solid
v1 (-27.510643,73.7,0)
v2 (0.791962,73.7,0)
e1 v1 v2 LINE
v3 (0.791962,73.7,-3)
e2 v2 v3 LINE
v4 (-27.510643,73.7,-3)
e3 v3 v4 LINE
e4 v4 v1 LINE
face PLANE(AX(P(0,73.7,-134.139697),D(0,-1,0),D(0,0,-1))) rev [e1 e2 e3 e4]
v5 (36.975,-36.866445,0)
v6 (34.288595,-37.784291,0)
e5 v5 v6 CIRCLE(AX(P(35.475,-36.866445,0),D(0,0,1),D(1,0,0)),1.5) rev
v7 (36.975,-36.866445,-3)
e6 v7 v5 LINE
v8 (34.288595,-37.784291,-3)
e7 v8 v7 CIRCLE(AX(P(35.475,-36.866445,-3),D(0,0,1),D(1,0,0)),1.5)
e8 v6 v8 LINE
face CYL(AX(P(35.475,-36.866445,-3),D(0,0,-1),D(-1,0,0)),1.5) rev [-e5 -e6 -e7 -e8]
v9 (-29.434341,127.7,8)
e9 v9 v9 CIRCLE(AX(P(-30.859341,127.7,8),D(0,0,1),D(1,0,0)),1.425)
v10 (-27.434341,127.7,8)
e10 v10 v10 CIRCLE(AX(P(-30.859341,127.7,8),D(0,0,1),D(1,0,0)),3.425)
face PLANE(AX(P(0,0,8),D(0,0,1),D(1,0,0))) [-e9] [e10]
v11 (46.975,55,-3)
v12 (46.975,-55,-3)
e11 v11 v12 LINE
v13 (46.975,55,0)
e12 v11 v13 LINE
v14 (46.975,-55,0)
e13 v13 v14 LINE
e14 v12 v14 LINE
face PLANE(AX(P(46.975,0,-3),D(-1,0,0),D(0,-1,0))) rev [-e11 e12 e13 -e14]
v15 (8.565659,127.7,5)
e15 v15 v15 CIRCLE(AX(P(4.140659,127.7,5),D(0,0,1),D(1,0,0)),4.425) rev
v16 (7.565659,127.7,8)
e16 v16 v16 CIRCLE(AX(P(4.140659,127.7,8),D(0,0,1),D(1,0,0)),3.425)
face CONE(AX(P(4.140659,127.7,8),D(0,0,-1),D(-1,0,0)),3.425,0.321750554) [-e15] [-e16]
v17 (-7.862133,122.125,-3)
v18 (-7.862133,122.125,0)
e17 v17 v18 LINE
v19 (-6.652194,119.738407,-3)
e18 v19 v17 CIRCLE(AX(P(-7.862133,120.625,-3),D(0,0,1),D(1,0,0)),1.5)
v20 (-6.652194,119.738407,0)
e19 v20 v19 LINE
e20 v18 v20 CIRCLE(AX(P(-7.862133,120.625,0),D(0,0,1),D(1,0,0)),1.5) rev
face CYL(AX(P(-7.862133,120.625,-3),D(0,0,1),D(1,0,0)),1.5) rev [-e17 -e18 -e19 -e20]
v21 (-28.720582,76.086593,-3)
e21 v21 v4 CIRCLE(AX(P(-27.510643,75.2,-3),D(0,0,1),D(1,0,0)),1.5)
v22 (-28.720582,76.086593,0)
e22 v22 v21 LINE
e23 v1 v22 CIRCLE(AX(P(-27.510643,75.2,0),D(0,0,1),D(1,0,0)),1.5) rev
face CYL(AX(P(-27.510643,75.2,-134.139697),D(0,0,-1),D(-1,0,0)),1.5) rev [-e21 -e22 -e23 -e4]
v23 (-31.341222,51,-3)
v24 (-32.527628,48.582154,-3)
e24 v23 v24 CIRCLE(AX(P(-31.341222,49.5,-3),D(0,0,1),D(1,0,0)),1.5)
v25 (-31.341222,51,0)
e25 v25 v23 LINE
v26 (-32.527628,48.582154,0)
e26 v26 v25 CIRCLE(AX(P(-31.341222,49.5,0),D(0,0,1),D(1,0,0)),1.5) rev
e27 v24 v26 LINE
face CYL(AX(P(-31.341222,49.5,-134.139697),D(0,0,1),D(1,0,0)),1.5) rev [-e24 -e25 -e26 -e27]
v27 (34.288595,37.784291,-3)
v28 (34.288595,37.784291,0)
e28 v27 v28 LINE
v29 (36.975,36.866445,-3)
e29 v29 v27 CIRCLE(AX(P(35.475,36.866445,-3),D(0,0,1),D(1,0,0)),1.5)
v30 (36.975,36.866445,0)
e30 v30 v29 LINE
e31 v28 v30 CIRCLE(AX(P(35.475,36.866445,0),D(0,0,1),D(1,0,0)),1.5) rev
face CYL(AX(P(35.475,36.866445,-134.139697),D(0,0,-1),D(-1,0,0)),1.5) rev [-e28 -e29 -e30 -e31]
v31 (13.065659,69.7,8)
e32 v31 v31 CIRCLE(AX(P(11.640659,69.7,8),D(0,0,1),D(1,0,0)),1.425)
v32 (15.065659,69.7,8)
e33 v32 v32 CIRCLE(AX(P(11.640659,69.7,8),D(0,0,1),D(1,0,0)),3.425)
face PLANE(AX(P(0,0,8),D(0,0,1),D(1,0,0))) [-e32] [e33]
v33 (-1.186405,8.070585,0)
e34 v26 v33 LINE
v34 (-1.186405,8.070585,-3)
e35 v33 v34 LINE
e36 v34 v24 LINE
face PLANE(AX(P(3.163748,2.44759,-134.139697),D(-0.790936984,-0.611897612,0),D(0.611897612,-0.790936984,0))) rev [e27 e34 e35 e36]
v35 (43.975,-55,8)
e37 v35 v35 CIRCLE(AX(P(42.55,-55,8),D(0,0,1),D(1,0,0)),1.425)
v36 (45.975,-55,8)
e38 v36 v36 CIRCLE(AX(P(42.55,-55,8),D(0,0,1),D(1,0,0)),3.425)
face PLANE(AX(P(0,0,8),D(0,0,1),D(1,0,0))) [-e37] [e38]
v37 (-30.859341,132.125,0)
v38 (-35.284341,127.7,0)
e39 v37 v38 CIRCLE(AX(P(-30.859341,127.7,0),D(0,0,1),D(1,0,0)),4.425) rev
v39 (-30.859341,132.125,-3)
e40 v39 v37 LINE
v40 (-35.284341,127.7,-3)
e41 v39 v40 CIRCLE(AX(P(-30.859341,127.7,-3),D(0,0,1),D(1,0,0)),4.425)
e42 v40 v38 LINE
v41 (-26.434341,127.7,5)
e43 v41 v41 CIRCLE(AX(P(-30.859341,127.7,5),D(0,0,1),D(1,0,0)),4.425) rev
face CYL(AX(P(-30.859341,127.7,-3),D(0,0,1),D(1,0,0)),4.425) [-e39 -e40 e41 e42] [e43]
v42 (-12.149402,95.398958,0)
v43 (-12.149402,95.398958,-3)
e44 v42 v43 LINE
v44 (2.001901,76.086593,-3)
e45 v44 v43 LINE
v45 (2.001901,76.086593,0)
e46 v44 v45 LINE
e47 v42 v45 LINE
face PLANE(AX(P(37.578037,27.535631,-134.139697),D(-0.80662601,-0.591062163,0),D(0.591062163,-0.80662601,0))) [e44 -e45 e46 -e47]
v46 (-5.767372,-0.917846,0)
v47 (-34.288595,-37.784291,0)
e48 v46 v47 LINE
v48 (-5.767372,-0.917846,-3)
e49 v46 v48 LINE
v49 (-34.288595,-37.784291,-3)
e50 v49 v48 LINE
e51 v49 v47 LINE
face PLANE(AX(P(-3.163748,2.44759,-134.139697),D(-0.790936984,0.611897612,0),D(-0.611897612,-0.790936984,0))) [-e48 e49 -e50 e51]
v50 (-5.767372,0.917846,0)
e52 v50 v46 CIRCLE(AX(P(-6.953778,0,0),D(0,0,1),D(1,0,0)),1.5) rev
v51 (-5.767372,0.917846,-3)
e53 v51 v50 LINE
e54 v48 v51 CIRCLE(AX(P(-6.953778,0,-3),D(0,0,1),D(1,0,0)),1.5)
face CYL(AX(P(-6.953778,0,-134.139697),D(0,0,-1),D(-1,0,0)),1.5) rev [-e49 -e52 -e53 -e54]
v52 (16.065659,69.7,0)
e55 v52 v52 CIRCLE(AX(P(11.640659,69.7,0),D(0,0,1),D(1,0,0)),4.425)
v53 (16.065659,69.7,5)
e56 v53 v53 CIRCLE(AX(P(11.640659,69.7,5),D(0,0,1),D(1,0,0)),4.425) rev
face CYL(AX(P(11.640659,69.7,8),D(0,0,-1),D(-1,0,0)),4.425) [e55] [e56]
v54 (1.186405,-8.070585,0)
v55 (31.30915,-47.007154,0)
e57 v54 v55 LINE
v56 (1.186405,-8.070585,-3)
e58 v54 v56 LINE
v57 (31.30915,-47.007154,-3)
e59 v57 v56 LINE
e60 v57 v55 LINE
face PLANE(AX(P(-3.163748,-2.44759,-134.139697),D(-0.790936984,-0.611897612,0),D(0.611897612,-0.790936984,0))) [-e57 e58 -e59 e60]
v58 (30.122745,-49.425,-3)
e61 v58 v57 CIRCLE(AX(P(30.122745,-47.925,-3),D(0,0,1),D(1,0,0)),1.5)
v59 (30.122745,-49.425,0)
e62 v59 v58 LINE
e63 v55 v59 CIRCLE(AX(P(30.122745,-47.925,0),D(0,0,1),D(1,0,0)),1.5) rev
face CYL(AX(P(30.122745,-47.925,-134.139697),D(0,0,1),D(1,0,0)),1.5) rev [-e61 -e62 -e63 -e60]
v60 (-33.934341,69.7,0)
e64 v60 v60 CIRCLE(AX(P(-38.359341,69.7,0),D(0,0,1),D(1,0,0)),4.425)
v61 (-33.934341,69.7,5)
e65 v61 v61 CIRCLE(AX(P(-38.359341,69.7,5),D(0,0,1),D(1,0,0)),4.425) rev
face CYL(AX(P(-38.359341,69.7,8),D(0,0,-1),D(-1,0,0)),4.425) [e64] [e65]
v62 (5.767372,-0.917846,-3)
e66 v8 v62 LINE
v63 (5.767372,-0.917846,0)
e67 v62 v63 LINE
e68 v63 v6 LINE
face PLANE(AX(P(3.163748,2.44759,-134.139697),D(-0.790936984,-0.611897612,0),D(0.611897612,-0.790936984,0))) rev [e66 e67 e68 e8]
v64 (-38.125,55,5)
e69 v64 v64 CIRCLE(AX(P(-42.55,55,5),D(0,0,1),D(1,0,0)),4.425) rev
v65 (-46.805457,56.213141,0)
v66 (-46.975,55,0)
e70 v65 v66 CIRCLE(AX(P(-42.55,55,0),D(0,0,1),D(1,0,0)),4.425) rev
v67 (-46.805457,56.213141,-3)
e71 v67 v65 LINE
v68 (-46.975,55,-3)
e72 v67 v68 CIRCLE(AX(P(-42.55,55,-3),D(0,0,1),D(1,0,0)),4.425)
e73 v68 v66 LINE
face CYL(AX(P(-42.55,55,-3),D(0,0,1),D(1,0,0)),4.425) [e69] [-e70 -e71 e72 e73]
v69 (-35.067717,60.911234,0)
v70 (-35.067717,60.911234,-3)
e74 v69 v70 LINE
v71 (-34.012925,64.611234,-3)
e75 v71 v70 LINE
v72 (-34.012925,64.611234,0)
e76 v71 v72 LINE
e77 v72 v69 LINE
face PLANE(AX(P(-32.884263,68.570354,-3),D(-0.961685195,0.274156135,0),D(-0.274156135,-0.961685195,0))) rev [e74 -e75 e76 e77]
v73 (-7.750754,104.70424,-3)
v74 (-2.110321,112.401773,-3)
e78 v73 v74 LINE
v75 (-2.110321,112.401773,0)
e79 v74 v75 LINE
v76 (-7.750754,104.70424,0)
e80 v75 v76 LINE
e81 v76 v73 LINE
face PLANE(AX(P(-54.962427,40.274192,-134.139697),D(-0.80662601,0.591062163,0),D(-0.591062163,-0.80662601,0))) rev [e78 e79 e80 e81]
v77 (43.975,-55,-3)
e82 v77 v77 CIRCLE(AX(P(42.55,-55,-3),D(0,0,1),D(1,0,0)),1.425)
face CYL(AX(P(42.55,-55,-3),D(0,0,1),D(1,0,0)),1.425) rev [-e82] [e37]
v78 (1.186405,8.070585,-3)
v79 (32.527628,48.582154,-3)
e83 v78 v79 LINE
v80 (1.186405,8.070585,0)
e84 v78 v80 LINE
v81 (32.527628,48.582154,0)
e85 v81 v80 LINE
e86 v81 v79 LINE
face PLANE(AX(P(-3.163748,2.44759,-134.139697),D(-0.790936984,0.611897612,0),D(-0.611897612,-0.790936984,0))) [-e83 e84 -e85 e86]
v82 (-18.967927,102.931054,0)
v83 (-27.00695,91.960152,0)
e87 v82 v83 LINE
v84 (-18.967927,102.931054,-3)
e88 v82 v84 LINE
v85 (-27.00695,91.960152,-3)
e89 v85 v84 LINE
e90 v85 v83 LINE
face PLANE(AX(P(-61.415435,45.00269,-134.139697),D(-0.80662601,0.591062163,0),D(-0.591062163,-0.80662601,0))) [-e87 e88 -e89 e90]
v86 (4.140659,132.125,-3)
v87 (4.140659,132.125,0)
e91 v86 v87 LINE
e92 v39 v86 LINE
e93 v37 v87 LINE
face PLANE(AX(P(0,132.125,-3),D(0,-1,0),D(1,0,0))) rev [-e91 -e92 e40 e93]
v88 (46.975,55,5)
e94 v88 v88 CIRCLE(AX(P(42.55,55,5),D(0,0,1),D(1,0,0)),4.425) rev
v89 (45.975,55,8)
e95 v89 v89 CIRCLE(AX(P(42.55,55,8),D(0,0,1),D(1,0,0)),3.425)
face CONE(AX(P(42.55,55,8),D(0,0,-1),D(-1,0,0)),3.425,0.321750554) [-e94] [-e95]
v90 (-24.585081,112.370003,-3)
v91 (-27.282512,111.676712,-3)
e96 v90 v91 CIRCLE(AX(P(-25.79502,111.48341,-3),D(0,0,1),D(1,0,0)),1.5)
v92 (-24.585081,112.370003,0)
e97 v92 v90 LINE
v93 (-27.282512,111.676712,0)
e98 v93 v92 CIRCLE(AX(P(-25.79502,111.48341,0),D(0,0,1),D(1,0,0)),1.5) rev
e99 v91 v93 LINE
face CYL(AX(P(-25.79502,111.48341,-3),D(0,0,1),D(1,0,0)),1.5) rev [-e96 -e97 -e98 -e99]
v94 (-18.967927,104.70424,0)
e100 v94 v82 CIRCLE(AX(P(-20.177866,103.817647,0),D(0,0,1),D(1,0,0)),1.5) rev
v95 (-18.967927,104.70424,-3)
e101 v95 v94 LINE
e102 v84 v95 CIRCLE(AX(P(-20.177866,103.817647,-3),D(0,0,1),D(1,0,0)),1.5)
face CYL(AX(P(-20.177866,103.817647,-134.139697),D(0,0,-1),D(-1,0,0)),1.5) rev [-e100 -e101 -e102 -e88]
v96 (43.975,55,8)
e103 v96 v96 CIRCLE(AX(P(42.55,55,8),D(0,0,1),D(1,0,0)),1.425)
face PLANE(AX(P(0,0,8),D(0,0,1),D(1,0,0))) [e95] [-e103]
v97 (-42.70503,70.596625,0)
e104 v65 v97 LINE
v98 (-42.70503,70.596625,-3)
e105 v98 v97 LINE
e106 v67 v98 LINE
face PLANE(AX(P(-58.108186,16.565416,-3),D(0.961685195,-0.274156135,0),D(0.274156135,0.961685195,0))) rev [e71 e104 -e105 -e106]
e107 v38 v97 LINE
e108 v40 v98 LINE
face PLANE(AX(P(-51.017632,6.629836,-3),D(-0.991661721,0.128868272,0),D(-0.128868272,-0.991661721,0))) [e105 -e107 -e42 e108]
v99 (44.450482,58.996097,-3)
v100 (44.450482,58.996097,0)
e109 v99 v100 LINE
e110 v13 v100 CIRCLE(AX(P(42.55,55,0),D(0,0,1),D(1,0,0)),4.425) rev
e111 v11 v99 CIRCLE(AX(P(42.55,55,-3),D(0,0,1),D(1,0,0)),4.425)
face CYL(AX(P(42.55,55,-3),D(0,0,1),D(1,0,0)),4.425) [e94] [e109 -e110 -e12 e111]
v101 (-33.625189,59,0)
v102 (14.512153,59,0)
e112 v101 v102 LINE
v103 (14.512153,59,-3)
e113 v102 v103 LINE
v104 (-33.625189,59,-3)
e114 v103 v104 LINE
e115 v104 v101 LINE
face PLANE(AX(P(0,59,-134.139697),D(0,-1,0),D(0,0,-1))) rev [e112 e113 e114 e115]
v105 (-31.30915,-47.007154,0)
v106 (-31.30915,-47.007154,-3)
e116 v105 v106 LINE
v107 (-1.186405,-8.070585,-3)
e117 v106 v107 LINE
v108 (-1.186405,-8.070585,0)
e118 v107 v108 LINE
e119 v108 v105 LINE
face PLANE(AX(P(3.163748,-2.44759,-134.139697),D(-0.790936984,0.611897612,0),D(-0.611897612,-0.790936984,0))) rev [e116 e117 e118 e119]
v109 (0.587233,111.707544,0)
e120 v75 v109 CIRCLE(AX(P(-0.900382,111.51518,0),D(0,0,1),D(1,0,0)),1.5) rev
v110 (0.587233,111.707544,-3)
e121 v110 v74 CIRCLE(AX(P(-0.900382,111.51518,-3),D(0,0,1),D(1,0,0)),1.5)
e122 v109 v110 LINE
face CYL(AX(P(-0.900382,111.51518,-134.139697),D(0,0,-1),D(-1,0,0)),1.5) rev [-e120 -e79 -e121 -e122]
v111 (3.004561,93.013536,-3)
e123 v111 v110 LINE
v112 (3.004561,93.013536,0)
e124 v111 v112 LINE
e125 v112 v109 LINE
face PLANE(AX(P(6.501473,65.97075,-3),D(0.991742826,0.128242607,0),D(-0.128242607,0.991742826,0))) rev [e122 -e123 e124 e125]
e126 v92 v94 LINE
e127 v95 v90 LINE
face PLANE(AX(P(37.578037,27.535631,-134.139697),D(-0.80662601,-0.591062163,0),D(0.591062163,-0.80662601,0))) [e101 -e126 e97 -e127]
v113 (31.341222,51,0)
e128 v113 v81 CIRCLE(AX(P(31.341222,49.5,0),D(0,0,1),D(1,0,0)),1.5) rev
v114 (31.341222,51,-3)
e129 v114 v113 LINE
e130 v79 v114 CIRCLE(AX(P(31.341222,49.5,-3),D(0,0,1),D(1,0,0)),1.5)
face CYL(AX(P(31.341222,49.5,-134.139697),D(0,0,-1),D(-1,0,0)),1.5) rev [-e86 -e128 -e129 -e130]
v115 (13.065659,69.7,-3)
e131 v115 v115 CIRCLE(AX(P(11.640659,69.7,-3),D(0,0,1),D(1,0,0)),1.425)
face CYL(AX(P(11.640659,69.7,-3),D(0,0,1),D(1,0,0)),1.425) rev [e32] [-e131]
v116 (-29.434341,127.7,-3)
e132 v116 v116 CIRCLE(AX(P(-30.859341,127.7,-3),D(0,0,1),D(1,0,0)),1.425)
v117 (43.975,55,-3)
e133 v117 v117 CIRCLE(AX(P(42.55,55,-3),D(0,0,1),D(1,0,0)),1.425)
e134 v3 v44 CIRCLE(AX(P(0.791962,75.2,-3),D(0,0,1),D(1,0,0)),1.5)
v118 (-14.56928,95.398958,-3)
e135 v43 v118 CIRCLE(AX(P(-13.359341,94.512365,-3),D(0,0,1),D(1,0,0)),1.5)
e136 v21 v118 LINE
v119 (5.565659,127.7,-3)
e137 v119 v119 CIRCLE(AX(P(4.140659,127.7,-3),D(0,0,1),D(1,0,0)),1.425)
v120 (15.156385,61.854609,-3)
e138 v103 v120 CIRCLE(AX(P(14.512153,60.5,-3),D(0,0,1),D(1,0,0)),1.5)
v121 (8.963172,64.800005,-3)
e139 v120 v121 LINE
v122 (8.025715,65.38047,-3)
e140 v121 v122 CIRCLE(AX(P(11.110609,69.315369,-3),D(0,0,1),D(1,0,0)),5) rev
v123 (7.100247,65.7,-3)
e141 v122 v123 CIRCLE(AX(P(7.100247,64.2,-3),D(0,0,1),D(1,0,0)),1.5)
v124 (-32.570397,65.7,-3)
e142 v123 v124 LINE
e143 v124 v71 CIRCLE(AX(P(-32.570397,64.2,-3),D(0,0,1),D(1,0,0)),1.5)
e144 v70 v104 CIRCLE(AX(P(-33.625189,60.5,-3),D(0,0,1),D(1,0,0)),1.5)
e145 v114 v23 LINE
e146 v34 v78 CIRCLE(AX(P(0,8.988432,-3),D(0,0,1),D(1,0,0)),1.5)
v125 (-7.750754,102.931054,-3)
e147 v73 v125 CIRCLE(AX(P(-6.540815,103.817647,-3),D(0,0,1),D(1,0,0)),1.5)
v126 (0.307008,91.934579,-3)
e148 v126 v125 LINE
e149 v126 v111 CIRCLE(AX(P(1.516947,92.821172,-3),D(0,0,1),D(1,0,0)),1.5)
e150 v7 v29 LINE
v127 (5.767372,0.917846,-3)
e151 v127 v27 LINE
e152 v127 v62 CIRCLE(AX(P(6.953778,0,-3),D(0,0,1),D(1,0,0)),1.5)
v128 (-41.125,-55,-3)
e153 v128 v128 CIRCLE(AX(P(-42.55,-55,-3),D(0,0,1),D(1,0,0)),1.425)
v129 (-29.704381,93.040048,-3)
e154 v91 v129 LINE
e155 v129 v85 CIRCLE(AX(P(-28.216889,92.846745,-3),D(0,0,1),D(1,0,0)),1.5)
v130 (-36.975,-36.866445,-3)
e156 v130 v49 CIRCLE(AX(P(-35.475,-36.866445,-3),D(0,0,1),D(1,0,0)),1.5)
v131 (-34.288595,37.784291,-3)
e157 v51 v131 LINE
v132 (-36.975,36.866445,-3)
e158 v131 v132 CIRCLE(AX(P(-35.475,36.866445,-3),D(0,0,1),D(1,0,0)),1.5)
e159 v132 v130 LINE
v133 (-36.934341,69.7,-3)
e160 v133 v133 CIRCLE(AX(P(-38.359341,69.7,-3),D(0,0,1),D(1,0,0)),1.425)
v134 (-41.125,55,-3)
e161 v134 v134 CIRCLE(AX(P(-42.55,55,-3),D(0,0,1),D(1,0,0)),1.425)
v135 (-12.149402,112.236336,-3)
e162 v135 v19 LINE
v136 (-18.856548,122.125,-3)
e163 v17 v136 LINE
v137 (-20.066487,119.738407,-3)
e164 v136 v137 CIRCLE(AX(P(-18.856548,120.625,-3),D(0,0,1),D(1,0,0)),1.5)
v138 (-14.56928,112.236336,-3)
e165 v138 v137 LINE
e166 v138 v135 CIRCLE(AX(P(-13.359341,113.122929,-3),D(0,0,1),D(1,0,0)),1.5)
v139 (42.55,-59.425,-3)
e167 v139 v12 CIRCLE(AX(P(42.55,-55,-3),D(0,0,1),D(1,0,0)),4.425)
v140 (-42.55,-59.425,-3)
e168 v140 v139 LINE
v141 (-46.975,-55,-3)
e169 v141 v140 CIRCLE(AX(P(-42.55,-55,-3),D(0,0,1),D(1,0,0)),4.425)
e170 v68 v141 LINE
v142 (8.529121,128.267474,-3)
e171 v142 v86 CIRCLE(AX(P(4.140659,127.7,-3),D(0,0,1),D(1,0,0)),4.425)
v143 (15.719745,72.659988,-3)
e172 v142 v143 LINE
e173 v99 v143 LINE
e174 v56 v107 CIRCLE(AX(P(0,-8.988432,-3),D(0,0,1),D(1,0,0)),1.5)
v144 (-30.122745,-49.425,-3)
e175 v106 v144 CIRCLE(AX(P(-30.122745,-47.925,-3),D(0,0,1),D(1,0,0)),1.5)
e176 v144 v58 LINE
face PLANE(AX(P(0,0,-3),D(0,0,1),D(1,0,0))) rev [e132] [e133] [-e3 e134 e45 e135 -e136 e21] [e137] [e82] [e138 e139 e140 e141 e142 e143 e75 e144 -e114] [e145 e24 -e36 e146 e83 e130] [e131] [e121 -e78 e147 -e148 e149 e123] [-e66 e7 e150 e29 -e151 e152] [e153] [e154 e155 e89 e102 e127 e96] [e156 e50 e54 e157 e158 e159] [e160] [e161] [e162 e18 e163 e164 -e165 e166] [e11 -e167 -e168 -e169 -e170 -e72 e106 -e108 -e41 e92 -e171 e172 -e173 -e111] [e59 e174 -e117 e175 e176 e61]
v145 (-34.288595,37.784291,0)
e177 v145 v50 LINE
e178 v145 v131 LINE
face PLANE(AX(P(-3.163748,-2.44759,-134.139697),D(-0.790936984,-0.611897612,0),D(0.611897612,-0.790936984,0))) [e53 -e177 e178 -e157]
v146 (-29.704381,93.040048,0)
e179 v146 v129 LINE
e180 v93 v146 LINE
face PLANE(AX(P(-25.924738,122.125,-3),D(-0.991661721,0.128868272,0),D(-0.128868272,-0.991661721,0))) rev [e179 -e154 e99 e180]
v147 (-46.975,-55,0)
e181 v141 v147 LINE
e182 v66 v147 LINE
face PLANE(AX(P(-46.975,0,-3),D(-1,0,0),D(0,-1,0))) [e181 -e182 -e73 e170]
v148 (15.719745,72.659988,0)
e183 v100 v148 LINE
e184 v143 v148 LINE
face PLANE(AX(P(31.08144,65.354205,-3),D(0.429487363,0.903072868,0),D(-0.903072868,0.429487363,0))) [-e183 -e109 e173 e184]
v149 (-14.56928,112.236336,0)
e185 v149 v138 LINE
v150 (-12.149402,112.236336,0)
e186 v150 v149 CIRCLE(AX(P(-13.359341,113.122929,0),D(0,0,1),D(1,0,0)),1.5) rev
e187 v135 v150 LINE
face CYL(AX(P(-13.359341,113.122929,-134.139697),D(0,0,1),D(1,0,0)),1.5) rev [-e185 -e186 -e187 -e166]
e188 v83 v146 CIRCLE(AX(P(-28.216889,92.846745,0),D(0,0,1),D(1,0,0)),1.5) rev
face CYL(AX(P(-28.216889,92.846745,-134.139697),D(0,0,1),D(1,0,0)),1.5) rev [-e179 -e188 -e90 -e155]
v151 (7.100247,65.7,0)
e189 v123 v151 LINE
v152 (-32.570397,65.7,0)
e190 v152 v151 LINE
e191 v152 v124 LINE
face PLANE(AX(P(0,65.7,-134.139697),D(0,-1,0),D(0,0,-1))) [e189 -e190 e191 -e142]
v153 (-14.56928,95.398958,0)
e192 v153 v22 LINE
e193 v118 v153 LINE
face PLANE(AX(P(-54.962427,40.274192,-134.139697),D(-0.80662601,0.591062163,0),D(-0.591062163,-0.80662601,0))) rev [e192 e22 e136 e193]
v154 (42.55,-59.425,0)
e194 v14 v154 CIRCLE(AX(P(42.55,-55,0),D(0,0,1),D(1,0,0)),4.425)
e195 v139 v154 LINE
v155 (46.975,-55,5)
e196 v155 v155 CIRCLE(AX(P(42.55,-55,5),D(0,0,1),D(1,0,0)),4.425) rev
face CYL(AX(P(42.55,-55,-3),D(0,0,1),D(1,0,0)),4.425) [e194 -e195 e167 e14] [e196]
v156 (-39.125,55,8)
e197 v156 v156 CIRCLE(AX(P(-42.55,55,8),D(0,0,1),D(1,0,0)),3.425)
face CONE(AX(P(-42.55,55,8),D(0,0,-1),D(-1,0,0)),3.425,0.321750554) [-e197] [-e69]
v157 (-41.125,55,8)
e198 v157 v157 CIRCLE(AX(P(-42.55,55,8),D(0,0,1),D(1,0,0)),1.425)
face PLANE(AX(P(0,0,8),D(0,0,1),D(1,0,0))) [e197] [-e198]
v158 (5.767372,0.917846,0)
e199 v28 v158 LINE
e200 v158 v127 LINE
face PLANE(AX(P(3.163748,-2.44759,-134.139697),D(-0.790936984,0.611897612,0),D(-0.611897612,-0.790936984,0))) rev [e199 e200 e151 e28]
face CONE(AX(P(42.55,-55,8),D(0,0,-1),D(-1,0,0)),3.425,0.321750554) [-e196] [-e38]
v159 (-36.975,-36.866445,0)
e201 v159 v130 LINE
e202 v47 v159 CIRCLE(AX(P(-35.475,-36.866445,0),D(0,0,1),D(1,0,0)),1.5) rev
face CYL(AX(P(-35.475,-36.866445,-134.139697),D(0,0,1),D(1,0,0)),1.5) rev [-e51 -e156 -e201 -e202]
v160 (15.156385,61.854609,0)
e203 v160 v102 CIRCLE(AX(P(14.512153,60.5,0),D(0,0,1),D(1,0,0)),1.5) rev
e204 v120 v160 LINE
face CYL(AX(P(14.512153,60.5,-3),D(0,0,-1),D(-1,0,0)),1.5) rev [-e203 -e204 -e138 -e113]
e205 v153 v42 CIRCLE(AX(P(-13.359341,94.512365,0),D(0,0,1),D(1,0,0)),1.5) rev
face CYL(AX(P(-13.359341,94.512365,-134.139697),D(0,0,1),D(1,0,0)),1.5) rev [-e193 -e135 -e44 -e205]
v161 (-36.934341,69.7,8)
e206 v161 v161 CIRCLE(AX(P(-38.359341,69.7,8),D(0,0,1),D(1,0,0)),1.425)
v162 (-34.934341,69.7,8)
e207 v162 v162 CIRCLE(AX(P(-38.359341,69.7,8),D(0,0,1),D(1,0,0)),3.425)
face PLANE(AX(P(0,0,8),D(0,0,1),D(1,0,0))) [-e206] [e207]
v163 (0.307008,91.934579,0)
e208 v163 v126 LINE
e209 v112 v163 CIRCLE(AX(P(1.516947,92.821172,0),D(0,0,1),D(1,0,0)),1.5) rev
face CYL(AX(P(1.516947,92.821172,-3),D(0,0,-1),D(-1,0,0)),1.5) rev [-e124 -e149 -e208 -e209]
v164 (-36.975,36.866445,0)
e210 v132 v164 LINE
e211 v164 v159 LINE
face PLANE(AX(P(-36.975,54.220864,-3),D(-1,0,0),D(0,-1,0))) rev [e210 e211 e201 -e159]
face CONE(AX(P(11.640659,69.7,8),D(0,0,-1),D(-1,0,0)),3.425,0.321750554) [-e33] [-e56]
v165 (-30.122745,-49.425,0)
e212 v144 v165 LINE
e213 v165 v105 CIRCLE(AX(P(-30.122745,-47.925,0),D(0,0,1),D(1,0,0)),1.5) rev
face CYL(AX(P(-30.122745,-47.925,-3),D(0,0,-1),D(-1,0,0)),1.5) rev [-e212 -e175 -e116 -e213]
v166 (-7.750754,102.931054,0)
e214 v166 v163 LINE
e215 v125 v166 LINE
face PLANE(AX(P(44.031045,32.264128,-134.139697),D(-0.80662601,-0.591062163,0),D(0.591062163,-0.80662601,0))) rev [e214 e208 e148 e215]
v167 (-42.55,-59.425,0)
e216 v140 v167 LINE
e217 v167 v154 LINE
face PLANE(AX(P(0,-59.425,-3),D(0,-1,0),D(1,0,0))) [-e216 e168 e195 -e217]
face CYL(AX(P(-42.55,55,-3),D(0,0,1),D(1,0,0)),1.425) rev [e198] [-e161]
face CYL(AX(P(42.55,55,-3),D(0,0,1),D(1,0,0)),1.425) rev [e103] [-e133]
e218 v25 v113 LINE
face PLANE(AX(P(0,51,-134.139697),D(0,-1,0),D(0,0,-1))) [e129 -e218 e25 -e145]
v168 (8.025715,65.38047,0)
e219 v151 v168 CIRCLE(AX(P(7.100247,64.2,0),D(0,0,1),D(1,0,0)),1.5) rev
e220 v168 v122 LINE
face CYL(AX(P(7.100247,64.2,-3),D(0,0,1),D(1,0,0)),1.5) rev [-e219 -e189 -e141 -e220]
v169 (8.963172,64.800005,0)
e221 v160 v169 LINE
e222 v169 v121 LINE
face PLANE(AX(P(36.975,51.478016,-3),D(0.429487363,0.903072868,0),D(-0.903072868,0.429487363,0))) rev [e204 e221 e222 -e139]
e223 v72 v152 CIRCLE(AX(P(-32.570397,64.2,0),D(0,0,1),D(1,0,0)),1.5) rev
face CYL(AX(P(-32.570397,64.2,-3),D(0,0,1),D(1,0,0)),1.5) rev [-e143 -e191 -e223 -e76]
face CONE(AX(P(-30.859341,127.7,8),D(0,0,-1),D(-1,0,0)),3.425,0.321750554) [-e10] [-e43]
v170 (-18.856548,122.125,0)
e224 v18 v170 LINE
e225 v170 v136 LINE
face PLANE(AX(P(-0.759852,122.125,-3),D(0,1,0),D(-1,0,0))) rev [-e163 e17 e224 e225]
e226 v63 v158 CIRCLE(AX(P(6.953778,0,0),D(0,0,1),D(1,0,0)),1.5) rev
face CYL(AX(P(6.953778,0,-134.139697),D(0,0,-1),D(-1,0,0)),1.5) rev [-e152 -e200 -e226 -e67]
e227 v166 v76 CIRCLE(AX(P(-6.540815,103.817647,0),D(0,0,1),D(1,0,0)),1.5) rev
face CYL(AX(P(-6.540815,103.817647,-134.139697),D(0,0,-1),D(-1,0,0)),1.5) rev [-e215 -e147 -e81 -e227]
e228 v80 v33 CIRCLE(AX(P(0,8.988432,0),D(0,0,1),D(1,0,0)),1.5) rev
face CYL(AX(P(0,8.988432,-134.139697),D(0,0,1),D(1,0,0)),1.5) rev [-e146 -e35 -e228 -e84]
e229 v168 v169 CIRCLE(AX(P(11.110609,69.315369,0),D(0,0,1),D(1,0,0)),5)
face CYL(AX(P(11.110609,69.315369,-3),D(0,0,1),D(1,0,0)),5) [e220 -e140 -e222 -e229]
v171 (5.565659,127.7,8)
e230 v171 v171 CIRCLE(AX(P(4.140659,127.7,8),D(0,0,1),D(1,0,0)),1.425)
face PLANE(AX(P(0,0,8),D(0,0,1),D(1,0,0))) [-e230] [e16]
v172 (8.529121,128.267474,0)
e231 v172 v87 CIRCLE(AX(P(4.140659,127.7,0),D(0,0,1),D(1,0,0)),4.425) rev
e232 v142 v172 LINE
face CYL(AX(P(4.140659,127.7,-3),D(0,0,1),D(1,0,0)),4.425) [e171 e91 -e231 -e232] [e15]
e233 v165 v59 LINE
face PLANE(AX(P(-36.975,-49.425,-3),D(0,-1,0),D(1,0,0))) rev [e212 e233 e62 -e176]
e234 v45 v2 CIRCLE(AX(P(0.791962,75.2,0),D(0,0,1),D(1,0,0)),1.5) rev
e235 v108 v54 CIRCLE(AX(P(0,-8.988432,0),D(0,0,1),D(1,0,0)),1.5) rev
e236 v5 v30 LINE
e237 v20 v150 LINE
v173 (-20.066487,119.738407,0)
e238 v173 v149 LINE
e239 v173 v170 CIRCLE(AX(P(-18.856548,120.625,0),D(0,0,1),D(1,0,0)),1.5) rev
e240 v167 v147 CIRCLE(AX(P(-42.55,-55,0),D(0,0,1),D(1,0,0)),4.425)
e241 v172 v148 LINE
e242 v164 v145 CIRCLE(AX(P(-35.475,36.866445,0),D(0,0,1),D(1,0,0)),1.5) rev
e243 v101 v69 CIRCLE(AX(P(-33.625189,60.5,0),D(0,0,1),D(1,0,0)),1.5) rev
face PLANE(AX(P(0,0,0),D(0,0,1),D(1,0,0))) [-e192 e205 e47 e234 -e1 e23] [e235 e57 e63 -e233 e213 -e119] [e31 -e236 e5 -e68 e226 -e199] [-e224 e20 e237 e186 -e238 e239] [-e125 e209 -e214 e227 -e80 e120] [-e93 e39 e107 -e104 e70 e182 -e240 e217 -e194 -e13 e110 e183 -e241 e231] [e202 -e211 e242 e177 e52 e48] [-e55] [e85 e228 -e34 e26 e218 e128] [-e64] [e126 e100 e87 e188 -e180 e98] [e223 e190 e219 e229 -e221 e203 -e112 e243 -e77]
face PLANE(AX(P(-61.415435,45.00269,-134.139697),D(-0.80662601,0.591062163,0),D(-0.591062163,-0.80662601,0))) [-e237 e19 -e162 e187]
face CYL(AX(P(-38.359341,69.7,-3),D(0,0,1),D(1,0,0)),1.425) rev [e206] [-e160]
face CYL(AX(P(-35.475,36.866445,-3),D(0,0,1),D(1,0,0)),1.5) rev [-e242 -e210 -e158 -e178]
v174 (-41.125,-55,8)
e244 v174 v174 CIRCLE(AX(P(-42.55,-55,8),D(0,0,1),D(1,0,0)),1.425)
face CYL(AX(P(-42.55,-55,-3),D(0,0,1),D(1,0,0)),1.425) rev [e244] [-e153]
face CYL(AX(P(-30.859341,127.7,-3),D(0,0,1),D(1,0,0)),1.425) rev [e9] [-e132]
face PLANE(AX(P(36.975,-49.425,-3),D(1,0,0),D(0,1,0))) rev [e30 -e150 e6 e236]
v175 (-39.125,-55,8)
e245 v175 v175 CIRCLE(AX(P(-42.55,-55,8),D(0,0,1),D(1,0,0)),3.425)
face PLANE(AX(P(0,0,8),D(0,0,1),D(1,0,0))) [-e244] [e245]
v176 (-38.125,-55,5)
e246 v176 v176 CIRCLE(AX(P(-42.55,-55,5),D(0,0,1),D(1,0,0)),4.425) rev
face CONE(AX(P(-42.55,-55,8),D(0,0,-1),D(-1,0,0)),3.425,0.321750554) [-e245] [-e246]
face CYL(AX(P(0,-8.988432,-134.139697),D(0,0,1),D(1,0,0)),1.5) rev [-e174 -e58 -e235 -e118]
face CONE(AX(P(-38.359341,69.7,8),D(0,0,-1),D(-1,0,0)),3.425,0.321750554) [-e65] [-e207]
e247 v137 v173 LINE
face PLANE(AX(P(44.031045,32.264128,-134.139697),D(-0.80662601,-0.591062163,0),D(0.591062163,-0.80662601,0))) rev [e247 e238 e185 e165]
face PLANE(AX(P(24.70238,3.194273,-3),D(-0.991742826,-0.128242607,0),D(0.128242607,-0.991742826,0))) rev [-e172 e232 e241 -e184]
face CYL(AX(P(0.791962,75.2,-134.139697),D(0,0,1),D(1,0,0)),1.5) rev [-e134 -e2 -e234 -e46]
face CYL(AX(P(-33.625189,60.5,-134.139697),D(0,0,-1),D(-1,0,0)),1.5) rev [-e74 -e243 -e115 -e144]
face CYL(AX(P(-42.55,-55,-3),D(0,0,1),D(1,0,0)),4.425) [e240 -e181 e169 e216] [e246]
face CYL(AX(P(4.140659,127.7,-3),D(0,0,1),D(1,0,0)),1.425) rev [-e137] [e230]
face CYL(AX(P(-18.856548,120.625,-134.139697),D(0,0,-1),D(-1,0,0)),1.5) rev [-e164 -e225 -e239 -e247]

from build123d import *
from OCP.BRepFilletAPI import BRepFilletAPI_MakeChamfer

# Parameters (mm, degrees)
BOSS_EXTRUDE1_START       = -3
BOSS_EXTRUDE1_OUTLINE_R   = 1.425
BOSS_EXTRUDE1_DEPTH       = 3
CUT_EXTRUDE1_DEPTH        = 141.259282224
FILLET1_R                 = 5
BOSS_EXTRUDE2_START       = -3
BOSS_EXTRUDE2_DEPTH       = 3
BOSS_EXTRUDE3_OUTLINE_R   = 4.425
BOSS_EXTRUDE3_OUTLINE_R_2 = 1.425
BOSS_EXTRUDE3_DEPTH       = 8
CHAMFER1_SIZE             = 3
CHAMFER1_SIZE2            = 1
FILLET2_R                 = 1.5


with BuildPart() as part:
    # Boss-Extrude1: read off the stored shape, not the designer's step
    # Boss-Extrude1 outline → Boss-Extrude1 (new body)
    with BuildSketch(Plane.XY.offset(BOSS_EXTRUDE1_START)):
        with BuildLine():
            Line((46.975, -55), (46.975, 55))
            ThreePointArc((46.975, 55), (46.291006282, 57.363365609), (44.450481582, 58.996097441))
            Line((44.450481582, 58.996097441), (15.719744672, 72.659987561))
            Line((15.719744672, 72.659987561), (8.529121486, 128.267473535))
            ThreePointArc((8.529121486, 128.267473535), (7.062093597, 131.023529403), (4.140659479, 132.125))
            Line((4.140659479, 132.125), (-30.859340521, 132.125))
            ThreePointArc((-30.859340521, 132.125), (-33.988288028, 130.828947507), (-35.284340521, 127.7))
            Line((-35.284340521, 127.7), (-42.705029635, 70.596624539))
            Line((-42.705029635, 70.596624539), (-46.805456987, 56.213140895))
            ThreePointArc((-46.805456987, 56.213140895), (-46.932409278, 55.612465441), (-46.975, 55))
            Line((-46.975, 55), (-46.975, -55))
            ThreePointArc((-46.975, -55), (-45.678947507, -58.128947507), (-42.55, -59.425))
            Line((-42.55, -59.425), (42.55, -59.425))
            ThreePointArc((42.55, -59.425), (45.678947507, -58.128947507), (46.975, -55))
        make_face()
        with Locations((-42.55, -55)):
            Circle(BOSS_EXTRUDE1_OUTLINE_R, mode=Mode.SUBTRACT)
        with Locations((42.55, -55)):
            Circle(BOSS_EXTRUDE1_OUTLINE_R, mode=Mode.SUBTRACT)
        with Locations((-42.55, 55)):
            Circle(BOSS_EXTRUDE1_OUTLINE_R, mode=Mode.SUBTRACT)
        with Locations((-38.359340521, 69.7)):
            Circle(BOSS_EXTRUDE1_OUTLINE_R, mode=Mode.SUBTRACT)
        with Locations((-30.859340521, 127.7)):
            Circle(BOSS_EXTRUDE1_OUTLINE_R, mode=Mode.SUBTRACT)
        with Locations((11.640659479, 69.7)):
            Circle(BOSS_EXTRUDE1_OUTLINE_R, mode=Mode.SUBTRACT)
        with Locations((42.55, 55)):
            Circle(BOSS_EXTRUDE1_OUTLINE_R, mode=Mode.SUBTRACT)
        with Locations((4.140659479, 127.7)):
            Circle(BOSS_EXTRUDE1_OUTLINE_R, mode=Mode.SUBTRACT)
    extrude(amount=BOSS_EXTRUDE1_DEPTH)

    # Sketch2 → Cut-Extrude1 (cut, through all)
    with BuildSketch(Plane.XY):
        Polygon((36.975, -49.425), (36.975, 51.478016268), (6.501473049, 65.970750135), (-0.759852365, 122.125), (-25.924738161, 122.125), (-32.884263276, 68.570354395), (-36.975, 54.220863544), (-36.975, -49.425), align=None)
    extrude(amount=-CUT_EXTRUDE1_DEPTH, mode=Mode.SUBTRACT)

    # Fillet1
    fillet1_edges = [part.edges().sort_by_distance(p)[0] for p in [
        (36.975, -49.425, -1.5),
        (-36.975, -49.425, -1.5),
        (-36.975, 54.220863544, -1.5),
        (-32.884263276, 68.570354395, -1.5),
        (-25.924738161, 122.125, -1.5),
        (-0.759852365, 122.125, -1.5),
        (6.501473049, 65.970750135, -1.5),
        (36.975, 51.478016268, -1.5),
    ]]
    fillet(fillet1_edges, radius=FILLET1_R)

    # Sketch3 → Boss-Extrude2 (add)
    with BuildSketch(Plane.XY.offset(BOSS_EXTRUDE2_START)):
        with BuildLine():
            Line((-13.359340521, 110.585124752), (-8.400412901, 103.817647059))
            Line((-8.400412901, 103.817647059), (0.106294158, 115.426800222))
            Line((0.106294158, 115.426800222), (-0.196216119, 117.766213034))
            ThreePointArc((-0.196216119, 117.766213034), (-1.762074631, 120.797673514), (-4.907872753, 122.118892529))
            Line((-4.907872753, 122.118892529), (-13.359340521, 110.585124752))
        make_face()
        Polygon((-18.318268141, 103.817647059), (-13.359340521, 97.050169366), (-8.400412901, 103.817647059), (-13.359340521, 110.585124752), align=None)
        Polygon((-30.456475647, 87.252563875), (-32.217656355, 73.7), (-30.469378419, 73.7), (-13.359340521, 97.050169366), (-18.318268141, 103.817647059), align=None)
        with BuildLine():
            Line((-26.490764046, 117.769341361), (-26.799669466, 115.392265338))
            Line((-26.799669466, 115.392265338), (-18.318268141, 103.817647059))
            Line((-18.318268141, 103.817647059), (-13.359340521, 110.585124752))
            Line((-13.359340521, 110.585124752), (-21.809649014, 122.117310459))
            ThreePointArc((-21.809649014, 122.117310459), (-24.935223371, 120.788491562), (-26.490764046, 117.769341361))
        make_face()
        Polygon((3.750697376, 73.7), (5.502001083, 73.7), (3.752025755, 87.233142539), (-8.400412901, 103.817647059), (-13.359340521, 97.050169366), align=None)
        Polygon((-32.217656355, 73.7), (-32.594546524, 70.799770586), (-30.469378419, 73.7), align=None)
        with BuildLine():
            Line((-32.986220482, 68.212708794), (-33.702540681, 65.7))
            Line((-33.702540681, 65.7), (7.656754768, 65.7))
            ThreePointArc((7.656754768, 65.7), (6.649193532, 67.057986899), (6.151894728, 68.674155814))
            Line((6.151894728, 68.674155814), (5.877280449, 70.797839571))
            Line((5.877280449, 70.797839571), (3.750697376, 73.7))
            Line((3.750697376, 73.7), (-30.469378419, 73.7))
            Line((-30.469378419, 73.7), (-32.594546524, 70.799770586))
            Line((-32.594546524, 70.799770586), (-32.836337852, 68.939148105))
            ThreePointArc((-32.836337852, 68.939148105), (-32.897789852, 68.573145266), (-32.986220482, 68.212708794))
        make_face()
        Polygon((3.750697376, 73.7), (5.877280449, 70.797839571), (5.502001083, 73.7), align=None)
        with BuildLine():
            ThreePointArc((-36.783425974, 54.892867127), (-36.862088643, 54.578668017), (-36.920243348, 54.260035115))
            Line((-36.920243348, 54.260035115), (-34.398161636, 51))
            Line((-34.398161636, 51), (34.398161636, 51))
            Line((34.398161636, 51), (35.248308123, 52.098896751))
            ThreePointArc((35.248308123, 52.098896751), (34.710224384, 52.504802867), (34.122436816, 52.834650803))
            Line((34.122436816, 52.834650803), (21.158703634, 59))
            Line((21.158703634, 59), (-35.61256915, 59))
            Line((-35.61256915, 59), (-36.783425974, 54.892867127))
        make_face()
        with BuildLine():
            Line((36.195636792, 51), (34.398161636, 51))
            Line((34.398161636, 51), (0, 6.537041363))
            Line((0, 6.537041363), (5.057292909, 0))
            Line((5.057292909, 0), (36.975, 41.25673067))
            Line((36.975, 41.25673067), (36.975, 48.319286463))
            ThreePointArc((36.975, 48.319286463), (36.776207346, 49.71514033), (36.195636792, 51))
        make_face()
        Polygon((-34.398161636, 51), (-36.975, 51), (-36.975, 41.25673067), (-5.057292909, 0), (0, 6.537041363), align=None)
        with BuildLine():
            ThreePointArc((-36.920243348, 54.260035115), (-36.961292046, 53.892075142), (-36.975, 53.522086454))
            Line((-36.975, 53.522086454), (-36.975, 51))
            Line((-36.975, 51), (-34.398161636, 51))
            Line((-34.398161636, 51), (-36.920243348, 54.260035115))
        make_face()
        with BuildLine():
            Line((35.248308123, 52.098896751), (34.398161636, 51))
            Line((34.398161636, 51), (36.195636792, 51))
            ThreePointArc((36.195636792, 51), (35.762043189, 51.583992251), (35.248308123, 52.098896751))
        make_face()
        with BuildLine():
            Line((5.057292909, 0), (0, -6.537041363))
            Line((0, -6.537041363), (33.08343567, -49.300589233))
            ThreePointArc((33.08343567, -49.300589233), (35.882824097, -47.544120201), (36.975, -44.425))
            Line((36.975, -44.425), (36.975, -41.25673067))
            Line((36.975, -41.25673067), (5.057292909, 0))
        make_face()
        with BuildLine():
            Line((-5.057292909, 0), (-36.975, -41.25673067))
            Line((-36.975, -41.25673067), (-36.975, -44.425))
            ThreePointArc((-36.975, -44.425), (-35.882824097, -47.544120201), (-33.08343567, -49.300589233))
            Line((-33.08343567, -49.300589233), (0, -6.537041363))
            Line((0, -6.537041363), (-5.057292909, 0))
        make_face()
        Polygon((0, 6.537041363), (-5.057292909, 0), (0, -6.537041363), (5.057292909, 0), align=None)
    extrude(amount=BOSS_EXTRUDE2_DEPTH)

    # Boss-Extrude3: read off the stored shape, not the designer's step
    # Boss-Extrude3 outline → Boss-Extrude3 (add)
    # profile 1 of 8: a face of its own
    with BuildSketch(Plane.XY):
        with Locations((42.55, -55)):
            Circle(BOSS_EXTRUDE3_OUTLINE_R)
        with Locations((42.55, -55)):
            Circle(BOSS_EXTRUDE3_OUTLINE_R_2, mode=Mode.SUBTRACT)
    # profile 2 of 8: a face of its own
    with BuildSketch(Plane.XY):
        with Locations((-42.55, -55)):
            Circle(BOSS_EXTRUDE3_OUTLINE_R)
        with Locations((-42.55, -55)):
            Circle(BOSS_EXTRUDE3_OUTLINE_R_2, mode=Mode.SUBTRACT)
    # profile 3 of 8: a face of its own
    with BuildSketch(Plane.XY):
        with Locations((-42.55, 55)):
            Circle(BOSS_EXTRUDE3_OUTLINE_R)
        with Locations((-42.55, 55)):
            Circle(BOSS_EXTRUDE3_OUTLINE_R_2, mode=Mode.SUBTRACT)
    # profile 4 of 8: a face of its own
    with BuildSketch(Plane.XY):
        with Locations((-30.859340521, 127.7)):
            Circle(BOSS_EXTRUDE3_OUTLINE_R)
        with Locations((-30.859340521, 127.7)):
            Circle(BOSS_EXTRUDE3_OUTLINE_R_2, mode=Mode.SUBTRACT)
    # profile 5 of 8: a face of its own
    with BuildSketch(Plane.XY):
        with Locations((4.140659479, 127.7)):
            Circle(BOSS_EXTRUDE3_OUTLINE_R)
        with Locations((4.140659479, 127.7)):
            Circle(BOSS_EXTRUDE3_OUTLINE_R_2, mode=Mode.SUBTRACT)
    # profile 6 of 8: a face of its own
    with BuildSketch(Plane.XY):
        with Locations((42.55, 55)):
            Circle(BOSS_EXTRUDE3_OUTLINE_R)
        with Locations((42.55, 55)):
            Circle(BOSS_EXTRUDE3_OUTLINE_R_2, mode=Mode.SUBTRACT)
    # profile 7 of 8: a face of its own
    with BuildSketch(Plane.XY):
        with Locations((11.640659479, 69.7)):
            Circle(BOSS_EXTRUDE3_OUTLINE_R)
        with Locations((11.640659479, 69.7)):
            Circle(BOSS_EXTRUDE3_OUTLINE_R_2, mode=Mode.SUBTRACT)
    # profile 8 of 8: a face of its own
    with BuildSketch(Plane.XY):
        with Locations((-38.359340521, 69.7)):
            Circle(BOSS_EXTRUDE3_OUTLINE_R)
        with Locations((-38.359340521, 69.7)):
            Circle(BOSS_EXTRUDE3_OUTLINE_R_2, mode=Mode.SUBTRACT)
    extrude(amount=BOSS_EXTRUDE3_DEPTH)

    # Chamfer1: one chamfer whose edges measure the first distance from different faces: ONE call of the kernel's chamfer builder (chamfer() names one face for all edges)
    chamfer1_edges_1 = [part.edges().sort_by_distance(p)[0] for p in [
        (-35.284340521, 127.7, 8),
    ]]
    chamfer1_side_1 = [part.faces().sort_by_distance(p)[0] for p in [
        (-35.284340521, 127.7, 4),
    ]]
    chamfer1_edges_2 = [part.edges().sort_by_distance(p)[0] for p in [
        (-0.284340521, 127.7, 8),
    ]]
    chamfer1_side_2 = [part.faces().sort_by_distance(p)[0] for p in [
        (-0.284340521, 127.7, 4),
    ]]
    chamfer1_edges_3 = [part.edges().sort_by_distance(p)[0] for p in [
        (7.215659479, 69.7, 8),
    ]]
    chamfer1_side_3 = [part.faces().sort_by_distance(p)[0] for p in [
        (7.215659479, 69.7, 4),
    ]]
    chamfer1_edges_4 = [part.edges().sort_by_distance(p)[0] for p in [
        (-42.784340521, 69.7, 8),
    ]]
    chamfer1_side_4 = [part.faces().sort_by_distance(p)[0] for p in [
        (-42.784340521, 69.7, 4),
    ]]
    chamfer1_edges_5 = [part.edges().sort_by_distance(p)[0] for p in [
        (-46.975, 55, 8),
    ]]
    chamfer1_side_5 = [part.faces().sort_by_distance(p)[0] for p in [
        (-46.975, 55, 4),
    ]]
    chamfer1_edges_6 = [part.edges().sort_by_distance(p)[0] for p in [
        (38.125, 55, 8),
    ]]
    chamfer1_side_6 = [part.faces().sort_by_distance(p)[0] for p in [
        (38.125, 55, 4),
    ]]
    chamfer1_edges_7 = [part.edges().sort_by_distance(p)[0] for p in [
        (38.125, -55, 8),
    ]]
    chamfer1_side_7 = [part.faces().sort_by_distance(p)[0] for p in [
        (38.125, -55.000000001, 4),
    ]]
    chamfer1_edges_8 = [part.edges().sort_by_distance(p)[0] for p in [
        (-46.975, -55, 8),
    ]]
    chamfer1_side_8 = [part.faces().sort_by_distance(p)[0] for p in [
        (-46.975, -55, 4),
    ]]
    chamfer1 = BRepFilletAPI_MakeChamfer(part.part.solid().wrapped)
    for e in chamfer1_edges_1:
        chamfer1.Add(CHAMFER1_SIZE, CHAMFER1_SIZE2, e.wrapped, chamfer1_side_1[0].wrapped)  # the first distance lies on this face
    for e in chamfer1_edges_2:
        chamfer1.Add(CHAMFER1_SIZE, CHAMFER1_SIZE2, e.wrapped, chamfer1_side_2[0].wrapped)  # the first distance lies on this face
    for e in chamfer1_edges_3:
        chamfer1.Add(CHAMFER1_SIZE, CHAMFER1_SIZE2, e.wrapped, chamfer1_side_3[0].wrapped)  # the first distance lies on this face
    for e in chamfer1_edges_4:
        chamfer1.Add(CHAMFER1_SIZE, CHAMFER1_SIZE2, e.wrapped, chamfer1_side_4[0].wrapped)  # the first distance lies on this face
    for e in chamfer1_edges_5:
        chamfer1.Add(CHAMFER1_SIZE, CHAMFER1_SIZE2, e.wrapped, chamfer1_side_5[0].wrapped)  # the first distance lies on this face
    for e in chamfer1_edges_6:
        chamfer1.Add(CHAMFER1_SIZE, CHAMFER1_SIZE2, e.wrapped, chamfer1_side_6[0].wrapped)  # the first distance lies on this face
    for e in chamfer1_edges_7:
        chamfer1.Add(CHAMFER1_SIZE, CHAMFER1_SIZE2, e.wrapped, chamfer1_side_7[0].wrapped)  # the first distance lies on this face
    for e in chamfer1_edges_8:
        chamfer1.Add(CHAMFER1_SIZE, CHAMFER1_SIZE2, e.wrapped, chamfer1_side_8[0].wrapped)  # the first distance lies on this face
    add(Compound.cast(chamfer1.Shape()), mode=Mode.REPLACE)

    # Fillet2
    # the kernel refuses this fillet: 1.5 mm, written as the material it adds along each edge
    with BuildSketch(Plane(origin=(36.975, -41.25673067, -3), x_dir=(0, 1, 0), z_dir=(0, 0, 1)), Plane(origin=(-36.975, 41.25673067, -3), x_dir=(0, -1, 0), z_dir=(0, 0, 1))) as fillet2_piece_1:
        with BuildLine():
            CenterArc((FILLET2_R * 2.92685728561, FILLET2_R), FILLET2_R, 127.726839505, 142.273160495)
            Line((FILLET2_R * 2.31495967357, FILLET2_R * 1.79093698383), (0, 0))
            Line((0, 0), (FILLET2_R * 2.92685728561, 0))
        make_face()
    extrude(amount=3)
    with BuildSketch(Plane(origin=(33.08343567, -49.300589233, -3), x_dir=(-0.9991182911759181, -0.04198380923300266, 0), z_dir=(0, 0, 1))) as fillet2_piece_2:
        with BuildLine():
            CenterArc((2.90032775, -1.498677437), FILLET2_R, 87.593797692, 127.726839505)
            Line((1.676433649, -2.36590476), (1.554044239, -2.452627493))
            Line((1.554044239, -2.452627493), (-0.12238941, -0.086722732))
            Line((-0.12238941, -0.086722732), (-0.027082876, 0.147534802))
            ThreePointArc((-0.027082876, 0.147534802), (1.118979162, 0.227632465), (2.969601035, 0.149867744))
            Line((2.969601035, 0.149867744), (2.963303464, 0))
        make_face()
    extrude(amount=3)
    with BuildSketch(Plane(origin=(0, -6.537041363, -3), x_dir=(0.6118976120341761, -0.7909369838279613, 0), z_dir=(0, 0, 1)), Plane(origin=(0, 6.537041363, -3), x_dir=(-0.6118976120341769, 0.7909369838279607, 0), z_dir=(0, 0, 1))) as fillet2_piece_3:
        with BuildLine():
            CenterArc((FILLET2_R * 1.29259694477, -FILLET2_R), FILLET2_R, 90, 104.54632099)
            Line((FILLET2_R * 0.324652041423, -FILLET2_R * 1.25116262477), (0, 0))
            Line((0, 0), (FILLET2_R * 1.29259694477, 0))
        make_face()
    extrude(amount=3)
    with BuildSketch(Plane(origin=(-33.08343567, -49.300589233, -3), x_dir=(0.6118976120341917, 0.7909369838279493, 0), z_dir=(0, 0, 1))) as fillet2_piece_4:
        with BuildLine():
            CenterArc((2.899643964, -1.5), FILLET2_R, 90, 127.726839505)
            Line((1.713238488, -2.417846418), (1.59459794, -2.50963106))
            ThreePointArc((1.59459794, -2.50963106), (0.461207515, -1.044614059), (-0.136035989, -0.063199759))
            Line((-0.136035989, -0.063199759), (0, 0.15))
            Line((0, 0.15), (2.899643964, 0.15))
            Line((2.899643964, 0.15), (2.899643964, 0))
        make_face()
    extrude(amount=3)
    with BuildSketch(Plane(origin=(-36.975, -41.25673067, -3), x_dir=(0, 1, 0), z_dir=(0, 0, 1)), Plane(origin=(36.975, 41.25673067, -3), x_dir=(0, -1, 0), z_dir=(0, 0, 1))) as fillet2_piece_5:
        with BuildLine():
            CenterArc((FILLET2_R * 2.92685728561, -FILLET2_R), FILLET2_R, 90, 142.273160495)
            Line((FILLET2_R * 2.31495967357, -FILLET2_R * 1.79093698383), (0, 0))
            Line((0, 0), (FILLET2_R * 2.92685728561, 0))
        make_face()
    extrude(amount=3)
    with BuildSketch(Plane(origin=(-5.057292909, 0, -3), x_dir=(-0.6118976120341743, 0.7909369838279628, 0), z_dir=(0, 0, 1)), Plane(origin=(5.057292909, 0, -3), x_dir=(0.611897612034178, -0.7909369838279598, 0), z_dir=(0, 0, 1))) as fillet2_piece_6:
        with BuildLine():
            CenterArc((FILLET2_R * 0.773636363636, FILLET2_R), FILLET2_R, 194.54632099, 75.45367901)
            Line((-FILLET2_R * 0.194308539711, FILLET2_R * 0.748837375226), (0, 0))
            Line((0, 0), (FILLET2_R * 0.773636363636, 0))
        make_face()
    extrude(amount=3)
    with BuildSketch(Plane(origin=(-34.398161636, 51, -3), x_dir=(0.611897612034177, -0.7909369838279607, 0), z_dir=(0, 0, 1))) as fillet2_piece_7:
        with BuildLine():
            CenterArc((FILLET2_R * 2.03795959096, FILLET2_R), FILLET2_R, 142.273160495, 127.726839505)
            Line((FILLET2_R * 1.24702260713, FILLET2_R * 1.61189761203), (0, 0))
            Line((0, 0), (FILLET2_R * 2.03795959096, 0))
        make_face()
    extrude(amount=3)
    with BuildSketch(Plane(origin=(34.398161636, 51, -3), x_dir=(-0.6118976120341773, -0.7909369838279604, 0), z_dir=(0, 0, 1))) as fillet2_piece_8:
        with BuildLine():
            CenterArc((FILLET2_R * 2.03795959096, -FILLET2_R), FILLET2_R, 90, 127.726839505)
            Line((FILLET2_R * 1.24702260713, -FILLET2_R * 1.61189761203), (0, 0))
            Line((0, 0), (FILLET2_R * 2.03795959096, 0))
        make_face()
    extrude(amount=3)
    with BuildSketch(Plane(origin=(21.158703634, 59, -3), x_dir=(-0.9030728679592901, 0.4294873632084912, 0), z_dir=(0, 0, 1))) as fillet2_piece_9:
        with BuildLine():
            CenterArc((FILLET2_R * 4.43103343889, FILLET2_R), FILLET2_R, 115.435031326, 154.564968674)
            Line((FILLET2_R * 4.00154607569, FILLET2_R * 1.90307286796), (0, 0))
            Line((0, 0), (FILLET2_R * 4.43103343889, 0))
        make_face()
    extrude(amount=3)
    with BuildSketch(Plane(origin=(7.656754768, 65.7, -3), x_dir=(0.7559277616775966, -0.6546550382645037, 0), z_dir=(0, 0, 1))) as fillet2_piece_10:
        with BuildLine():
            CenterArc((0.561302952, -1.498212199), FILLET2_R, 92.797658541, 38.095839762)
            Line((-0.420679605, -0.364320557), (0, 0))
            ThreePointArc((0, 0), (0.244044762, -0.005959336), (0.488089524, 0))
        make_face()
    extrude(amount=3)
    with BuildSketch(Plane(origin=(-35.61256915, 59, -3), x_dir=(1, 0, 0), z_dir=(0, 0, 1))) as fillet2_piece_11:
        with BuildLine():
            CenterArc((FILLET2_R * 1.32492019361, FILLET2_R), FILLET2_R, 164.08826839, 105.91173161)
            Line((FILLET2_R * 0.363234998803, FILLET2_R * 1.2741561345), (0, 0))
            Line((0, 0), (FILLET2_R * 1.32492019361, 0))
        make_face()
    extrude(amount=3)
    with BuildSketch(Plane(origin=(-33.702540681, 65.7, -3), x_dir=(-0.274156134500953, -0.961685194809349, 0), z_dir=(0, 0, 1))) as fillet2_piece_12:
        with BuildLine():
            CenterArc((FILLET2_R * 0.754762441407, FILLET2_R), FILLET2_R, 195.91173161, 74.08826839)
            Line((-FILLET2_R * 0.206922753403, FILLET2_R * 0.725843865499), (0, 0))
            Line((0, 0), (FILLET2_R * 0.754762441407, 0))
        make_face()
    extrude(amount=3)
    with BuildSketch(Plane(origin=(-30.469378419, 73.7, -3), x_dir=(1, 0, 0), z_dir=(0, 0, 1))) as fillet2_piece_13:
        with BuildLine():
            CenterArc((FILLET2_R * 1.97249052566, FILLET2_R), FILLET2_R, 143.767581245, 126.232418755)
            Line((FILLET2_R * 1.16586451564, FILLET2_R * 1.59106216252), (0, 0))
            Line((0, 0), (FILLET2_R * 1.97249052566, 0))
        make_face()
    extrude(amount=3)
    with BuildSketch(Plane(origin=(3.750697376, 73.7, -3), x_dir=(-1, 0, 0), z_dir=(0, 0, 1))) as fillet2_piece_14:
        with BuildLine():
            CenterArc((FILLET2_R * 1.97249052566, -FILLET2_R), FILLET2_R, 90, 126.232418755)
            Line((FILLET2_R * 1.16586451564, -FILLET2_R * 1.59106216252), (0, 0))
            Line((0, 0), (FILLET2_R * 1.97249052566, 0))
        make_face()
    extrude(amount=3)
    with BuildSketch(Plane(origin=(-13.359340521, 97.050169366, -3), x_dir=(0.5910621625154567, -0.8066260100210951, 0), z_dir=(0, 0, 1))) as fillet2_piece_15:
        with BuildLine():
            CenterArc((FILLET2_R * 1.36470588235, -FILLET2_R), FILLET2_R, 90, 107.535162489)
            Line((FILLET2_R * 0.411173654704, -FILLET2_R * 1.30129104009), (0, 0))
            Line((0, 0), (FILLET2_R * 1.36470588235, 0))
        make_face()
    extrude(amount=3)
    with BuildSketch(Plane(origin=(3.752025755, 87.233142539, -3), x_dir=(-0.12824260686651673, 0.9917428264343937, 0), z_dir=(0, 0, 1))) as fillet2_piece_16:
        with BuildLine():
            CenterArc((FILLET2_R * 3.88568031429, FILLET2_R), FILLET2_R, 118.864367684, 151.135632316)
            Line((FILLET2_R * 3.40294247693, FILLET2_R * 1.87576491159), (0, 0))
            Line((0, 0), (FILLET2_R * 3.88568031429, 0))
        make_face()
    extrude(amount=3)
    with BuildSketch(Plane(origin=(-8.400412901, 103.817647059, -3), x_dir=(0.5910621625154552, -0.8066260100210961, 0), z_dir=(0, 0, 1)), Plane(origin=(-18.318268141, 103.817647059, -3), x_dir=(-0.5910621625154587, 0.8066260100210937, 0), z_dir=(0, 0, 1))) as fillet2_piece_17:
        with BuildLine():
            CenterArc((FILLET2_R * 0.73275862069, FILLET2_R), FILLET2_R, 197.535162489, 72.464837511)
            Line((-FILLET2_R * 0.220773606959, FILLET2_R * 0.698708959915), (0, 0))
            Line((0, 0), (FILLET2_R * 0.73275862069, 0))
        make_face()
    extrude(amount=3)
    with BuildSketch(Plane(origin=(0.106294158, 115.426800222, -3), x_dir=(0.12824260686651523, -0.991742826434394, 0), z_dir=(0, 0, 1))) as fillet2_piece_18:
        with BuildLine():
            CenterArc((FILLET2_R * 2.5001486338, -FILLET2_R), FILLET2_R, 90, 136.399530173)
            Line((FILLET2_R * 1.81052315186, -FILLET2_R * 1.72416620651), (0, 0))
            Line((0, 0), (FILLET2_R * 2.5001486338, 0))
        make_face()
    extrude(amount=3)
    with BuildSketch(Plane(origin=(-30.456475647, 87.252563875, -3), x_dir=(0.1288682722639774, 0.9916617207514351, 0), z_dir=(0, 0, 1))) as fillet2_piece_19:
        with BuildLine():
            CenterArc((FILLET2_R * 3.89076482555, -FILLET2_R), FILLET2_R, 90, 151.171780247)
            Line((FILLET2_R * 3.40857960467, -FILLET2_R * 1.87606929678), (0, 0))
            Line((0, 0), (FILLET2_R * 3.89076482555, 0))
        make_face()
    extrude(amount=3)
    with BuildSketch(Plane(origin=(-26.799669466, 115.392265338, -3), x_dir=(-0.12886827226397635, -0.9916617207514352, 0), z_dir=(0, 0, 1))) as fillet2_piece_20:
        with BuildLine():
            CenterArc((FILLET2_R * 2.49786318774, FILLET2_R), FILLET2_R, 133.636617758, 136.363382242)
            Line((FILLET2_R * 1.80778096632, FILLET2_R * 1.72373097742), (0, 0))
            Line((0, 0), (FILLET2_R * 2.49786318774, 0))
        make_face()
    extrude(amount=3)
    with BuildSketch(Plane(origin=(-13.359340521, 110.585124752, -3), x_dir=(0.5910621625154566, 0.8066260100210952, 0), z_dir=(0, 0, 1))) as fillet2_piece_21:
        with BuildLine():
            CenterArc((FILLET2_R * 1.36470588235, FILLET2_R), FILLET2_R, 162.464837511, 107.535162489)
            Line((FILLET2_R * 0.411173654704, FILLET2_R * 1.30129104009), (0, 0))
            Line((0, 0), (FILLET2_R * 1.36470588235, 0))
        make_face()
    extrude(amount=3)
    with BuildSketch(Plane(origin=(-4.907872753, 122.118892529, -3), x_dir=(-0.9999978630525282, 0.0020673389603159615, 0), z_dir=(0, 0, 1))) as fillet2_piece_22:
        with BuildLine():
            CenterArc((2.951165791, 1.499996795), FILLET2_R, 143.886031126, 126.232418755)
            Line((1.739396473, 2.38408679), (1.618219541, 2.472495789))
            Line((1.618219541, 2.472495789), (-0.121176932, 0.088409))
            Line((-0.121176932, 0.088409), (-0.007101987, -0.149831778))
            ThreePointArc((-0.007101987, -0.149831778), (0.247379697, -0.155596386), (2.954576901, -0.149999679))
            Line((2.954576901, -0.149999679), (2.9542668, 0))
        make_face()
    extrude(amount=3)
    with BuildSketch(Plane(origin=(-21.809649014, 122.117310459, -3), x_dir=(0.5910621625154486, -0.806626010021101, 0), z_dir=(0, 0, 1))) as fillet2_piece_23:
        with BuildLine():
            CenterArc((2.94920282, 1.5), FILLET2_R, 143.767581245, 126.232418755)
            Line((1.739263805, 2.386593244), (1.618269903, 2.475252568))
            ThreePointArc((1.618269903, 2.475252568), (0.036642147, 0.316795865), (-0.125722983, 0.081815228))
            Line((-0.125722983, 0.081815228), (0, -0.15))
            Line((0, -0.15), (2.94920282, -0.15))
            Line((2.94920282, -0.15), (2.94920282, 0))
        make_face()
    extrude(amount=3)


solid = part.part
